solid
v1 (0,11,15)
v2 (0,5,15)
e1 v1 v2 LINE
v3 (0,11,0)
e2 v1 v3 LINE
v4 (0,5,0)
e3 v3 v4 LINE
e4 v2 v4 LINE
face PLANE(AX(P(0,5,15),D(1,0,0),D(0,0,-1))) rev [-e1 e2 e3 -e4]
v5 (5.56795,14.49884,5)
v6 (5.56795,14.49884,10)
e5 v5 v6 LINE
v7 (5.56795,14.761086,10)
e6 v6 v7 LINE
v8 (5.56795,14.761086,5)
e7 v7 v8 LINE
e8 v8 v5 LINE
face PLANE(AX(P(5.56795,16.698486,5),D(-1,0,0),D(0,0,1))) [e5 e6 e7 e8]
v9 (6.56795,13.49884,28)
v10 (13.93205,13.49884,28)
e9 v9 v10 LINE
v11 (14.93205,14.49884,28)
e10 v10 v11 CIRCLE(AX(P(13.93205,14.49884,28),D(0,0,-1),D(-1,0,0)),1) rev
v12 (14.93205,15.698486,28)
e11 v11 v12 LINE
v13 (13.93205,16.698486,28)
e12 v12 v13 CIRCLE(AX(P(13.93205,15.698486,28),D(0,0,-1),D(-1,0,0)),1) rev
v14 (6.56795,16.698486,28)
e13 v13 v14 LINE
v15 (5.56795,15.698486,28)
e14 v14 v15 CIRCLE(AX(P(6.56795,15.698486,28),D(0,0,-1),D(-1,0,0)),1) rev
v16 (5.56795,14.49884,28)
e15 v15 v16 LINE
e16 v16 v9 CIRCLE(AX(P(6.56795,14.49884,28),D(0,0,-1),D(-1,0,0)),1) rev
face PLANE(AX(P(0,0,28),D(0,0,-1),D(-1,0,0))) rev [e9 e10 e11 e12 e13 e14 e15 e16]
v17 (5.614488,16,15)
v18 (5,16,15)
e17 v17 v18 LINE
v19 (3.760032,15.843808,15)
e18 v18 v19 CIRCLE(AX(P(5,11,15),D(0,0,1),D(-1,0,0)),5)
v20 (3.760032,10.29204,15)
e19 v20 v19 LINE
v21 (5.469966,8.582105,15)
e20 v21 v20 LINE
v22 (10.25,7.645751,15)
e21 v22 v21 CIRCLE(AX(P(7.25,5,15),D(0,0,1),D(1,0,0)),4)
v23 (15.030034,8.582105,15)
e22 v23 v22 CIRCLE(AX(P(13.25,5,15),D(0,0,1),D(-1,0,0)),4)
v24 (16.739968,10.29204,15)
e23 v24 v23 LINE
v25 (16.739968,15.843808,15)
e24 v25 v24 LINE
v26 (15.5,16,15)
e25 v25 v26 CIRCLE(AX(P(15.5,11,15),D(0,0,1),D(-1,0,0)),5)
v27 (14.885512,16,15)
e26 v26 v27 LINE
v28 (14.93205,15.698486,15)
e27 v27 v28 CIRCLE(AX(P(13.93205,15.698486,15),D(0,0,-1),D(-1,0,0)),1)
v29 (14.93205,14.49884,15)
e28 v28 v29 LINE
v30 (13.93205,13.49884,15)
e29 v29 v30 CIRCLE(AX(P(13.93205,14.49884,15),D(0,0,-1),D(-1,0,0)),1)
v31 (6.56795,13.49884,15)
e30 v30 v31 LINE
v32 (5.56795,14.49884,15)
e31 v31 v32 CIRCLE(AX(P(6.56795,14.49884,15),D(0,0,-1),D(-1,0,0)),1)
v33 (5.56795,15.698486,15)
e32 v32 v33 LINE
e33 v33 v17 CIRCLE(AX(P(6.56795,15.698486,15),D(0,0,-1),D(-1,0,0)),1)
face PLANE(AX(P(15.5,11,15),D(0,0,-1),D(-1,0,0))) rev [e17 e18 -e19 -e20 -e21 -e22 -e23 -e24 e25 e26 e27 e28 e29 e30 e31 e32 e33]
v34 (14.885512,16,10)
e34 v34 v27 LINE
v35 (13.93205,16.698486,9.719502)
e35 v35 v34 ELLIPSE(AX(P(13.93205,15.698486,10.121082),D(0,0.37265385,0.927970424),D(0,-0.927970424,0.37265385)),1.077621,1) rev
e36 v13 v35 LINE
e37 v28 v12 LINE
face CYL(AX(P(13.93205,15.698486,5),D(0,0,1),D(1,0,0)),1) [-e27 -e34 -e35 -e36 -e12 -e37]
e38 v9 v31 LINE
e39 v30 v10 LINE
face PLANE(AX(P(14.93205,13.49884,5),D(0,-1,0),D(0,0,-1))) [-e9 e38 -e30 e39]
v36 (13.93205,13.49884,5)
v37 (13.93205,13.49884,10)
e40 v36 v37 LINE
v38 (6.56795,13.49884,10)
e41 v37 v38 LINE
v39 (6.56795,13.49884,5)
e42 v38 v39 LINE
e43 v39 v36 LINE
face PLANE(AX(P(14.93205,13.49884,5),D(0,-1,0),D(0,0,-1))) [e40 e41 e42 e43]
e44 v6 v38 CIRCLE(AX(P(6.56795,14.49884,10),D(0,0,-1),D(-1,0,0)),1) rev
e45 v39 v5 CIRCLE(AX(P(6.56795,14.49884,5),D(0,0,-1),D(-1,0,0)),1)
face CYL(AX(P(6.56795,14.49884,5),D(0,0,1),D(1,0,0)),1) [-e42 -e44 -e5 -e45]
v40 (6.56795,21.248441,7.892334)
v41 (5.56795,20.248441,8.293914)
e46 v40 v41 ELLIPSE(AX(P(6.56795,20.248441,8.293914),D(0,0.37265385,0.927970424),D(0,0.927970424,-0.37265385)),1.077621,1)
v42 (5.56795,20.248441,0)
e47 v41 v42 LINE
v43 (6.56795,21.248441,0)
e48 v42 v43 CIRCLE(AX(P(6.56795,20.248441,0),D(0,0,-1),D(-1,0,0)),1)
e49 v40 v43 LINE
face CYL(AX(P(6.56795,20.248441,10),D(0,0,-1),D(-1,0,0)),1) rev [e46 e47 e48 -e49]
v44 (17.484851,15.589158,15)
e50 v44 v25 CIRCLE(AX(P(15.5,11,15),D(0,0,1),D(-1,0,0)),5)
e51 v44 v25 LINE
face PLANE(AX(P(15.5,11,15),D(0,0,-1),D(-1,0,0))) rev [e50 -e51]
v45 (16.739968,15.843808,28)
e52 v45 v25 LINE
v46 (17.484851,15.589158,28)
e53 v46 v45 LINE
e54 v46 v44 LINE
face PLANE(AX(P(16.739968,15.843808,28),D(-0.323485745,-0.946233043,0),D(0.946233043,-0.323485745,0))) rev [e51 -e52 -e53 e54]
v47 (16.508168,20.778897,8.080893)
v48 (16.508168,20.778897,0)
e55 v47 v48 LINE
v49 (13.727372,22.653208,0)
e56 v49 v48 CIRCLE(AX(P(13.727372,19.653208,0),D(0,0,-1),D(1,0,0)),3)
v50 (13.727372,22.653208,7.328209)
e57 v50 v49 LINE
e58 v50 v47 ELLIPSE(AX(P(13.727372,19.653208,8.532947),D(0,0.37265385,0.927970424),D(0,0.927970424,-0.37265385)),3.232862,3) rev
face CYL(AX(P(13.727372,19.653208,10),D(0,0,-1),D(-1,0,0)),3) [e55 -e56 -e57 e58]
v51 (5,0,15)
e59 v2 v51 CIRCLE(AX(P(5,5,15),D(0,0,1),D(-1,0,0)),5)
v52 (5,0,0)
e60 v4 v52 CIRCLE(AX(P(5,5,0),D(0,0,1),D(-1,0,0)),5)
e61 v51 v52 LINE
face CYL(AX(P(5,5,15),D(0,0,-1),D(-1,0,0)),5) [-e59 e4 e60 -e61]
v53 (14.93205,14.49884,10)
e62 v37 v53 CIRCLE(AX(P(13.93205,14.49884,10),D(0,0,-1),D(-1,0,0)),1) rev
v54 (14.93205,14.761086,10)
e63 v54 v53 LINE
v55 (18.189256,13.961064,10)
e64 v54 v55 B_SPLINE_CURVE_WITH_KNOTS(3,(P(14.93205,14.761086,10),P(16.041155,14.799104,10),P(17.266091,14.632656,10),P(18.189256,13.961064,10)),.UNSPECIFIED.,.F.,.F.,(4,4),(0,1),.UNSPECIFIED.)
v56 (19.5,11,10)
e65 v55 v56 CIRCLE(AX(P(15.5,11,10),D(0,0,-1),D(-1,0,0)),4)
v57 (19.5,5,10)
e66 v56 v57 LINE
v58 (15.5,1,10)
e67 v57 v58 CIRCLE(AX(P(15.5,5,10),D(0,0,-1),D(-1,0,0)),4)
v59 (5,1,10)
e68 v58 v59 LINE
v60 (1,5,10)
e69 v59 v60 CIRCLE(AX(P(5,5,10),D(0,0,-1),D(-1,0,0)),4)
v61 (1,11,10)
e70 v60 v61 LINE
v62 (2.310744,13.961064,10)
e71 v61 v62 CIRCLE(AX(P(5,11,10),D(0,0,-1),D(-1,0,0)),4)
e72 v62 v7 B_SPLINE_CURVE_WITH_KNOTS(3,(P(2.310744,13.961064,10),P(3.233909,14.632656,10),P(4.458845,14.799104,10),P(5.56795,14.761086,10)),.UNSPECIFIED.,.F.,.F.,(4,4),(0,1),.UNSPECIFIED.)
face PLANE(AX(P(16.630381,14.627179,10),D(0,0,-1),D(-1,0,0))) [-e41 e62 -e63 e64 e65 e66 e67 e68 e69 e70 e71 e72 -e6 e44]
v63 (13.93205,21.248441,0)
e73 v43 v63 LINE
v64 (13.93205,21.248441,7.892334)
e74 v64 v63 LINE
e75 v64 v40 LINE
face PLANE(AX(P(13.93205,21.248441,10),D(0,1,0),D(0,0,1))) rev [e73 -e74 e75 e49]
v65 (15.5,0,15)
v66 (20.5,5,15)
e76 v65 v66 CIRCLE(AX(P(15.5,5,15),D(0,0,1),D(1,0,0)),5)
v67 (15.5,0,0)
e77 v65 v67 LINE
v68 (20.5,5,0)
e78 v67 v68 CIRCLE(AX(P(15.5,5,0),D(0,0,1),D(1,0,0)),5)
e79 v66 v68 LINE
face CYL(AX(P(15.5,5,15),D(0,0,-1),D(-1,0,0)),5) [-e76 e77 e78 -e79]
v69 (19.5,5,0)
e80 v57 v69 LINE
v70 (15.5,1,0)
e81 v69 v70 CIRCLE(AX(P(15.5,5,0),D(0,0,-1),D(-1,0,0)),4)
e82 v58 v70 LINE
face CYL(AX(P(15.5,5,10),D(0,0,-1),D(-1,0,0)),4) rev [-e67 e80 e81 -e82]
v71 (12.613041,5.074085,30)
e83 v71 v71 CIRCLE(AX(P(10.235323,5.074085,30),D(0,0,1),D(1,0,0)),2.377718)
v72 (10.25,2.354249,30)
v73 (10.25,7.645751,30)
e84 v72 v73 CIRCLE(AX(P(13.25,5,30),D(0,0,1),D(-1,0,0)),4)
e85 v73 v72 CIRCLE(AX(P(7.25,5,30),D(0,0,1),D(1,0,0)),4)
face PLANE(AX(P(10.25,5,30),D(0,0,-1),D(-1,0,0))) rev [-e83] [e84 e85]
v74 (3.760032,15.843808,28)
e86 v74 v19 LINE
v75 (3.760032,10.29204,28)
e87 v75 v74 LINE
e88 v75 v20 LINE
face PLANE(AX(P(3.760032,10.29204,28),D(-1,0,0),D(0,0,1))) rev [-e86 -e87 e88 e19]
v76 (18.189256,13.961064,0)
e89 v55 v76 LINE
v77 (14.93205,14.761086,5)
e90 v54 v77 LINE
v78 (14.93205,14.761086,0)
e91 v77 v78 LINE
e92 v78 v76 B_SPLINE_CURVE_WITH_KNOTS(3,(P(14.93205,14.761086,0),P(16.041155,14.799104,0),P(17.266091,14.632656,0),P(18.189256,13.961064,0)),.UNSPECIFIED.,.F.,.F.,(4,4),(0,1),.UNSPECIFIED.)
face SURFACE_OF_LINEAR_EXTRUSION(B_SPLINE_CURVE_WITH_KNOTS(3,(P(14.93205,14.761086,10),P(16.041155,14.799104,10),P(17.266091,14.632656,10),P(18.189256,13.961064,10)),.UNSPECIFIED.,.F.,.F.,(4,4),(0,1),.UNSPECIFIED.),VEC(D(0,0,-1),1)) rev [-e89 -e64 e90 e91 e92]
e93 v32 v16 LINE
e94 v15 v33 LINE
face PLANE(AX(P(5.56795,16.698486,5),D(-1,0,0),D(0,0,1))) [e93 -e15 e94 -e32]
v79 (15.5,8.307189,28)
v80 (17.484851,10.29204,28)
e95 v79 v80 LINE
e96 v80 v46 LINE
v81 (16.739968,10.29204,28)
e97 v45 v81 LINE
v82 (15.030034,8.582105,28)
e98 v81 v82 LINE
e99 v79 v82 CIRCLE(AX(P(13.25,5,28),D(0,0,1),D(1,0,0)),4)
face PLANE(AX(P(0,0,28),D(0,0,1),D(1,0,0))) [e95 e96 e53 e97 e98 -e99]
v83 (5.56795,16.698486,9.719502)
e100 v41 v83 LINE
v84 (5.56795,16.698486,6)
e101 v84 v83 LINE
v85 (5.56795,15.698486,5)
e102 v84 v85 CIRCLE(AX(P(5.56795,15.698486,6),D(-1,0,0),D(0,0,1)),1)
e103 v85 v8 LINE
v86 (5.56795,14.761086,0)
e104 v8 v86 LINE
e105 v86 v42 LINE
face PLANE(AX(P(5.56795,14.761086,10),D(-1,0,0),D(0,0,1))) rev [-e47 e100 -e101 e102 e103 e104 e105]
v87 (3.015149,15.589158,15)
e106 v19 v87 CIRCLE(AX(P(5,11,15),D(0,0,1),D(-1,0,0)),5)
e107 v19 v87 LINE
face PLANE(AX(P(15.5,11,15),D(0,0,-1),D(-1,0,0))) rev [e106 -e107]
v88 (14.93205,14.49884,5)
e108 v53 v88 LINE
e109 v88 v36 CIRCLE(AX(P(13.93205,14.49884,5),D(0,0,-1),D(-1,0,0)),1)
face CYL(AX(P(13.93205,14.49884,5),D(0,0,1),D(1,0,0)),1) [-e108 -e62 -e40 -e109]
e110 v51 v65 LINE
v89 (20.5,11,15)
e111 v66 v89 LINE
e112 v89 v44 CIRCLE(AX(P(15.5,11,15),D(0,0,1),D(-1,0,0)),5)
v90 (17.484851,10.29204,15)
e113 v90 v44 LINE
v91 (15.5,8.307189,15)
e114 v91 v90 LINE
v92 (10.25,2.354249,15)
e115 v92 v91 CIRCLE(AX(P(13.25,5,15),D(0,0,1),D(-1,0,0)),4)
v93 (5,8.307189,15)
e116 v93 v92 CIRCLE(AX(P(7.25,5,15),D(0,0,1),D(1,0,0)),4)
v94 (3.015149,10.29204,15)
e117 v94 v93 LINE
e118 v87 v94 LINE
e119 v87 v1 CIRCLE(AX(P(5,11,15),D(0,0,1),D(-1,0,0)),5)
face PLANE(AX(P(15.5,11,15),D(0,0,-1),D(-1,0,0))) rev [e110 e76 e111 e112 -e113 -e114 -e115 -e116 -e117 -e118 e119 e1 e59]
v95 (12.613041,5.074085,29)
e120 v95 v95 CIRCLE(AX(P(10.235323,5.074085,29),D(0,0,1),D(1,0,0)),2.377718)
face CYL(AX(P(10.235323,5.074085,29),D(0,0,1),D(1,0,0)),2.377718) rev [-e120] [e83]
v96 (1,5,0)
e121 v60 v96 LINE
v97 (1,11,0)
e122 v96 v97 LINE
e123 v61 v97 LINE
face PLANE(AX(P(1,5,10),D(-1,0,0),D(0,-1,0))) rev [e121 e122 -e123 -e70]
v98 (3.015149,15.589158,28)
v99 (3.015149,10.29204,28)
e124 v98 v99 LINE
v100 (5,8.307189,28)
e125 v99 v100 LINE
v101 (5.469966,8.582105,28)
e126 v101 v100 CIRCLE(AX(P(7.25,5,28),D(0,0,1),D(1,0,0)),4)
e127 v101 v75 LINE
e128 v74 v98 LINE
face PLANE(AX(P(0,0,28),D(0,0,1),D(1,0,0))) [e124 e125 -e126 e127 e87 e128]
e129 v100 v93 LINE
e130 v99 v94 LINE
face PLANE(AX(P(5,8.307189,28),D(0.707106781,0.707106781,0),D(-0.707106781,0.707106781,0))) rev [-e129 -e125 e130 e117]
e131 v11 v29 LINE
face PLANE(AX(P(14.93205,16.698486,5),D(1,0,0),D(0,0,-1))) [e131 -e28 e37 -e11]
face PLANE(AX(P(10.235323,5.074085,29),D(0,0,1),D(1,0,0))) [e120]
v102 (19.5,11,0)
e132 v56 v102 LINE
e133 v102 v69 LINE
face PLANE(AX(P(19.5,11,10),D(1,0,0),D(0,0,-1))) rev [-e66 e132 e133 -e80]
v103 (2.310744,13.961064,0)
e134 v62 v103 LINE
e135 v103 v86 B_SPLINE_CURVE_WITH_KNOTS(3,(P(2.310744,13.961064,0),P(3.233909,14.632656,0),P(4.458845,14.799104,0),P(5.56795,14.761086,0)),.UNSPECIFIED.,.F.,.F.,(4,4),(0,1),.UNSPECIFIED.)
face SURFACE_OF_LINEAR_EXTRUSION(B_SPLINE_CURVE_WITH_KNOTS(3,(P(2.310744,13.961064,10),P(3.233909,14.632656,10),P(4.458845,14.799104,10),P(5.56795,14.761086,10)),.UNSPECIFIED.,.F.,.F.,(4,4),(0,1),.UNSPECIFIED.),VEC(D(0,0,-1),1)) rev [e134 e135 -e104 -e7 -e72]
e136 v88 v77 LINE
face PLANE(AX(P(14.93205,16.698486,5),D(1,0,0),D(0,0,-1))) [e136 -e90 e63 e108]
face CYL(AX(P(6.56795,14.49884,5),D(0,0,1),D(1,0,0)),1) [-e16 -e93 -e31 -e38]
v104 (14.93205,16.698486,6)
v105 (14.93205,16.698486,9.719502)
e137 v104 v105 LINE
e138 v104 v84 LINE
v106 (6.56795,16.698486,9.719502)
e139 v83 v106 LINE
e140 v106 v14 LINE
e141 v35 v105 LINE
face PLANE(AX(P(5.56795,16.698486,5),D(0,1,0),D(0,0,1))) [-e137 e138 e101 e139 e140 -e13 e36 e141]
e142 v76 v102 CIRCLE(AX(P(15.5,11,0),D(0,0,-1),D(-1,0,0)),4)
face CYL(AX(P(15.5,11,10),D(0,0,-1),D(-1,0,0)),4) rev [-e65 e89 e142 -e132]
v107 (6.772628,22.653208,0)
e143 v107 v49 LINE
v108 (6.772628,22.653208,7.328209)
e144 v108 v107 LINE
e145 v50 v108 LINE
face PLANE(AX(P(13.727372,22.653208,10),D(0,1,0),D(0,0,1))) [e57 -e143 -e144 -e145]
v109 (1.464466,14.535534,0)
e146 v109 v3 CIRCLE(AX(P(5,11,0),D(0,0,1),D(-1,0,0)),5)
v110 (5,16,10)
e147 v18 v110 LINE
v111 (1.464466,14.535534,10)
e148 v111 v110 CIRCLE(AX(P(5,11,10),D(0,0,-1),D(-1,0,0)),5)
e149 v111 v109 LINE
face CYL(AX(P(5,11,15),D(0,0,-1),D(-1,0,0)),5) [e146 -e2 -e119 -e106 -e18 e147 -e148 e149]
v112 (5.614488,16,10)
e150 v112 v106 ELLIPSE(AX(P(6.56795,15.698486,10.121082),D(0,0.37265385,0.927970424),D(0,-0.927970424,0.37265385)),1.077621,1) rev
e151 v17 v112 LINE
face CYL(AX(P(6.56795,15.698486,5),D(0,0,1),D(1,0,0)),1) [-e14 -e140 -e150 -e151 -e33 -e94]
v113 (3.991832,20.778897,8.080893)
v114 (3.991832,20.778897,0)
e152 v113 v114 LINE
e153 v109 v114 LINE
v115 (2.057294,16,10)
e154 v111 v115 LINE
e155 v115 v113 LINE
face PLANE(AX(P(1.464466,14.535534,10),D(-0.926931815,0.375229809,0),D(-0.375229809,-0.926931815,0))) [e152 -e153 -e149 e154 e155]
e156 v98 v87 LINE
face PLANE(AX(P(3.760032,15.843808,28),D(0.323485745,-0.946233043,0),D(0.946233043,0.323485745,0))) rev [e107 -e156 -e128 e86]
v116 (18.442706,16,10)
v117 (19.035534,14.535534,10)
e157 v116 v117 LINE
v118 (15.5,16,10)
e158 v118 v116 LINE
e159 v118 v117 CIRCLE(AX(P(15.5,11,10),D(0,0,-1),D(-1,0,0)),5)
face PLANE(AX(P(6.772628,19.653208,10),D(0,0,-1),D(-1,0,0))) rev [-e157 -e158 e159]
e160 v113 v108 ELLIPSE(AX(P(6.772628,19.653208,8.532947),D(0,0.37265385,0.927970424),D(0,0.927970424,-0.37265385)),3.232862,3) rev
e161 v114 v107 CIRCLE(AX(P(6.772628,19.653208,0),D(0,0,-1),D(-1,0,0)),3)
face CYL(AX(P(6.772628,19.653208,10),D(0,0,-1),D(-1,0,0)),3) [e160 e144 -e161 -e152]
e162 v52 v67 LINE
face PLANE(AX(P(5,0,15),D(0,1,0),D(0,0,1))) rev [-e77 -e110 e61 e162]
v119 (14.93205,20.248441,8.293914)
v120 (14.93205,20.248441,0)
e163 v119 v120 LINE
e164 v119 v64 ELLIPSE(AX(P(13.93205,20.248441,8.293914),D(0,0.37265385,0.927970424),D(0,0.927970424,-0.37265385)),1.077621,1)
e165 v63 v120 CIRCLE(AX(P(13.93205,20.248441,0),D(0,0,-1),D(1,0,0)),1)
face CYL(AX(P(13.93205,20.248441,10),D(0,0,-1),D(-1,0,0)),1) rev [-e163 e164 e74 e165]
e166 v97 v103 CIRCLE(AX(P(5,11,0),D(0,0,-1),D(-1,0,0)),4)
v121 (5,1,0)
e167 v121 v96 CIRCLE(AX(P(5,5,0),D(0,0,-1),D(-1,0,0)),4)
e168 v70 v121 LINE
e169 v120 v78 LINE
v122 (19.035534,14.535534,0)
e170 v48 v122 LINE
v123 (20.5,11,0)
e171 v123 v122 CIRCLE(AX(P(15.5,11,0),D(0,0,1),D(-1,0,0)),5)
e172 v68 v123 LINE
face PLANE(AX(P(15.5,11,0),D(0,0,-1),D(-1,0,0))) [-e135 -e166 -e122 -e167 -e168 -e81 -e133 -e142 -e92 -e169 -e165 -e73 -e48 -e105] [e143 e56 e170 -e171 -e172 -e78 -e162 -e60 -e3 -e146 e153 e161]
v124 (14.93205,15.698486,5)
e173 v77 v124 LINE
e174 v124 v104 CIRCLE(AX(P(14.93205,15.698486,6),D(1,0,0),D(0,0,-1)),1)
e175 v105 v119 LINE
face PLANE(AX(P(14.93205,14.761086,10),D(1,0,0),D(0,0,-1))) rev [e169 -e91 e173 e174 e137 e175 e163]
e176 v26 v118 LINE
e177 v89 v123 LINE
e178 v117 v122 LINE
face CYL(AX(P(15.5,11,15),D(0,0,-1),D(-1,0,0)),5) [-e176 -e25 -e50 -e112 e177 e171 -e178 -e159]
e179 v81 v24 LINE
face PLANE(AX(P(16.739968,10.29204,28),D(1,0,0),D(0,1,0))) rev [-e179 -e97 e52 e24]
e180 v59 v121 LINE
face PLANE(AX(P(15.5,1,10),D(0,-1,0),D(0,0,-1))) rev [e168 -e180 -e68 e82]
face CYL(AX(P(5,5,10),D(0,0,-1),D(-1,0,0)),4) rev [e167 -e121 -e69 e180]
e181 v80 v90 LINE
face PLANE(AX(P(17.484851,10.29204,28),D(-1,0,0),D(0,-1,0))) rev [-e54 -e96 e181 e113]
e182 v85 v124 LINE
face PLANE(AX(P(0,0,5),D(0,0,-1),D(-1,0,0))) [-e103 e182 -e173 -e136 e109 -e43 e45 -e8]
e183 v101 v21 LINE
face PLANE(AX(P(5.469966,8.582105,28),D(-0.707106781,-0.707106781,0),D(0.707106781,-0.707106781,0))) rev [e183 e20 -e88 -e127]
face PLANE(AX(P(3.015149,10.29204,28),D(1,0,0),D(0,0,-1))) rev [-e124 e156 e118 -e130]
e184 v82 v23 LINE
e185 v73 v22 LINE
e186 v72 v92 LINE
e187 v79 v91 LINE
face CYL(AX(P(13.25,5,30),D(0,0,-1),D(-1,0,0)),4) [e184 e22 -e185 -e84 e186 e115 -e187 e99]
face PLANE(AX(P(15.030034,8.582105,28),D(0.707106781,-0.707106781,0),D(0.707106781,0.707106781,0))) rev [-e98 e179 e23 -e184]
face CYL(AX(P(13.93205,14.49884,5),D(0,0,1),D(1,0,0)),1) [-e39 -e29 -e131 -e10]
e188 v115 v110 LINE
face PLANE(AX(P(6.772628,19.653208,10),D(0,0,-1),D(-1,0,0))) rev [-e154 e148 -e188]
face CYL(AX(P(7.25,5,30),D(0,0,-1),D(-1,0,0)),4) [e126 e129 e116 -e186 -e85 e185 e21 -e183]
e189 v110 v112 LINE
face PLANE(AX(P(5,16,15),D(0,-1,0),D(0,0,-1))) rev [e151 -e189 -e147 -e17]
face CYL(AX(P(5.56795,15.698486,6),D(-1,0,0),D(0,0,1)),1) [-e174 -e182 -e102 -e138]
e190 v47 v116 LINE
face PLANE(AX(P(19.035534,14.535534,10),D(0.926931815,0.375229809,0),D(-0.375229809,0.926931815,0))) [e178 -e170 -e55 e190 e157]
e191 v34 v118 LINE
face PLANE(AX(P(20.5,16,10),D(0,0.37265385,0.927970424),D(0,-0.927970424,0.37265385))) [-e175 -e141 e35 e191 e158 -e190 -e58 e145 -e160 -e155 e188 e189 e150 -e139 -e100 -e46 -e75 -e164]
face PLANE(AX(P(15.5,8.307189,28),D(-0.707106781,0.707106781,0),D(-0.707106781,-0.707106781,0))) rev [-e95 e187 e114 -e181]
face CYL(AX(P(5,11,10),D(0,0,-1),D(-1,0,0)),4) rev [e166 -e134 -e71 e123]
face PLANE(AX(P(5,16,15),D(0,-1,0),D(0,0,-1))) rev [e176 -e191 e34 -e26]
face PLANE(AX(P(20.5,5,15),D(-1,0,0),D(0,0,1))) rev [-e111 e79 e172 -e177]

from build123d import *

# Parameters (mm, degrees)
EXTRUDE_1_DEPTH      = 15
EXTRUDE_2_DEPTH      = 15
EXTRUDE_3_DEPTH      = 13
EXTRUDE_4_DEPTH      = 10
CUT_EXTRUDE_2_DEPTH  = 43.818428432
CUT_EXTRUDE_3_DEPTH  = 10
EXTRUDE_5_DEPTH      = 13
EXTRUDE_5_DEPTH_BACK = 10
SKETCH_7_W           = 9.36410038
SKETCH_7_H           = 3.199645584
FILLET_1_R           = 1
SKETCH_8_R           = 2.377718278
CUT_EXTRUDE_4_DEPTH  = 1


with BuildPart() as part:
    # ｽｹｯﾁ1 → ﾎﾞｽ - 押し出し1 (new body)
    with BuildSketch(Plane.XY):
        with BuildLine():
            Line((5, 0), (15.5, 0))
            ThreePointArc((15.5, 0), (19.035533906, 1.464466094), (20.5, 5))
            Line((20.5, 5), (20.5, 11))
            ThreePointArc((20.5, 11), (19.035533906, 14.535533906), (15.5, 16))
            Line((15.5, 16), (5, 16))
            ThreePointArc((5, 16), (1.464466094, 14.535533906), (0, 11))
            Line((0, 11), (0, 5))
            ThreePointArc((0, 5), (1.464466094, 1.464466094), (5, 0))
        make_face()
    extrude(amount=EXTRUDE_1_DEPTH)

    # ｽｹｯﾁ2 → ﾎﾞｽ - 押し出し2 (add)
    with BuildSketch(Plane.XY.offset(15)):
        with BuildLine():
            ThreePointArc((10.25, 7.645751311), (3.25, 5), (10.25, 2.354248689))
            ThreePointArc((10.25, 2.354248689), (17.25, 5), (10.25, 7.645751311))
        make_face()
    extrude(amount=EXTRUDE_2_DEPTH)

    # ｽｹｯﾁ3 → ﾎﾞｽ - 押し出し3 (add)
    with BuildSketch(Plane.XY.offset(15)):
        Polygon((5, 8.307189139), (3.015149344, 10.292039795), (3.015149344, 15.589157643), (3.760031936, 15.843808337), (3.760031936, 10.292039795), (5.469966234, 8.582105497), align=None)
        Polygon((15.5, 8.307189139), (15.030033766, 8.582105497), (16.739968064, 10.292039795), (16.739968064, 15.843808337), (17.484850656, 15.589157643), (17.484850656, 10.292039795), align=None)
    extrude(amount=EXTRUDE_3_DEPTH)

    # ｽｹｯﾁ4 → ﾎﾞｽ - 押し出し4 (add)
    with BuildSketch(Plane(origin=(0, 0, 0), x_dir=(-1, 0, 0), z_dir=(0, 0, -1))):
        with BuildLine():
            Line((-19.035533906, 14.535533906), (-16.508167917, 20.778897002))
            ThreePointArc((-16.508167917, 20.778897002), (-15.404115105, 22.140884029), (-13.727372471, 22.653207574))
            Line((-13.727372471, 22.653207574), (-6.772627529, 22.653207574))
            ThreePointArc((-6.772627529, 22.653207574), (-5.095884895, 22.140884029), (-3.991832083, 20.778897002))
            Line((-3.991832083, 20.778897002), (-1.464466094, 14.535533906))
            Line((-1.464466094, 14.535533906), (-19.035533906, 14.535533906))
        make_face()
    extrude(amount=-EXTRUDE_4_DEPTH)

    # ｽｹｯﾁ5 → ｶｯﾄ - 押し出し2 (cut, through all)
    with BuildSketch(Plane(origin=(0, 0, 0), x_dir=(0, 0, -1), z_dir=(1, 0, 0))):
        Polygon((-10, 16), (-7.328208582, 22.653207574), (-10, 22.653207574), align=None)
    extrude(amount=CUT_EXTRUDE_2_DEPTH, mode=Mode.SUBTRACT)

    # ｽｹｯﾁ6 → ｶｯﾄ - 押し出し3 (cut)
    with BuildSketch(Plane(origin=(0, 0, 0), x_dir=(-1, 0, 0), z_dir=(0, 0, -1))):
        with BuildLine():
            Line((-14.93205019, 14.761085745), (-14.93205019, 20.248440553))
            ThreePointArc((-14.93205019, 20.248440553), (-14.639156971, 20.955547334), (-13.93205019, 21.248440553))
            Line((-13.93205019, 21.248440553), (-6.56794981, 21.248440553))
            ThreePointArc((-6.56794981, 21.248440553), (-5.860843029, 20.955547334), (-5.56794981, 20.248440553))
            Line((-5.56794981, 20.248440553), (-5.56794981, 14.761085745))
            add(Edge.make_bspline(
                [(-2.310743979, 13.961064345), (-3.233908529, 14.632656192), (-4.458845113, 14.799104366), (-5.56794981, 14.761085745)],
                knots=[0, 0, 0, 0, 1, 1, 1, 1], degree=3))
            ThreePointArc((-2.310743979, 13.961064345), (-1.342335165, 12.619100972), (-1, 11))
            Line((-1, 11), (-1, 5))
            ThreePointArc((-1, 5), (-2.171572875, 2.171572875), (-5, 1))
            Line((-5, 1), (-15.5, 1))
            ThreePointArc((-15.5, 1), (-18.328427125, 2.171572875), (-19.5, 5))
            Line((-19.5, 5), (-19.5, 11))
            ThreePointArc((-19.5, 11), (-19.157664835, 12.619100972), (-18.189256021, 13.961064345))
            add(Edge.make_bspline(
                [(-18.189256021, 13.961064345), (-17.266091471, 14.632656192), (-16.041154887, 14.799104366), (-14.93205019, 14.761085745)],
                knots=[0, 0, 0, 0, 1, 1, 1, 1], degree=3))
        make_face()
    extrude(amount=-CUT_EXTRUDE_3_DEPTH, mode=Mode.SUBTRACT)

    # ｽｹｯﾁ7 → ﾎﾞｽ - 押し出し5 (add, two sides: drawn at the far end of the back side and taken through both)
    with BuildSketch(Plane.XY.offset(15).offset(-EXTRUDE_5_DEPTH_BACK)):
        with Locations((10.25, 15.098663031)):
            Rectangle(SKETCH_7_W, SKETCH_7_H)
    extrude(amount=EXTRUDE_5_DEPTH + EXTRUDE_5_DEPTH_BACK)

    # ﾌｨﾚｯﾄ1
    # the kernel refuses this fillet: 1 mm, written as the material it takes off along each edge
    with BuildSketch(Plane(origin=(14.93205019, 16.698485823, 5), x_dir=(0, 0, 1), z_dir=(-1, 0, 0))) as fillet_1_piece_1:
        with BuildLine():
            CenterArc((FILLET_1_R, -FILLET_1_R), FILLET_1_R, 90, 90)
            Line((0, -FILLET_1_R), (0, 0))
            Line((0, 0), (FILLET_1_R, 0))
        make_face()
    extrude(amount=9.36410038, mode=Mode.SUBTRACT)
    with BuildSketch(Plane(origin=(14.93205019, 13.498840239, 2.5), x_dir=(0, 1, 0), z_dir=(0, 0, 1))) as fillet_1_piece_2:
        with BuildLine():
            CenterArc((FILLET_1_R, FILLET_1_R), FILLET_1_R, 180, 90)
            Line((0, FILLET_1_R), (0, 0))
            Line((0, 0), (FILLET_1_R, 0))
        make_face()
    extrude(amount=7.5, mode=Mode.SUBTRACT)
    with BuildSketch(Plane(origin=(5.56794981, 13.498840239, 2.5), x_dir=(0, 1, 0), z_dir=(0, 0, 1))) as fillet_1_piece_3:
        with BuildLine():
            CenterArc((FILLET_1_R, -FILLET_1_R), FILLET_1_R, 90, 90)
            Line((0, -FILLET_1_R), (0, 0))
            Line((0, 0), (FILLET_1_R, 0))
        make_face()
    extrude(amount=7.5, mode=Mode.SUBTRACT)
    with BuildSketch(Plane(origin=(5.56794981, 13.498840239, 15), x_dir=(0, 1, 0), z_dir=(0, 0, 1)), Plane(origin=(14.93205019, 13.498840239, 15), x_dir=(-1, 0, 0), z_dir=(0, 0, 1))) as fillet_1_piece_4:
        with BuildLine():
            CenterArc((FILLET_1_R, -FILLET_1_R), FILLET_1_R, 90, 90)
            Line((0, -FILLET_1_R), (0, 0))
            Line((0, 0), (FILLET_1_R, 0))
        make_face()
    extrude(amount=15.5, mode=Mode.SUBTRACT)
    with BuildSketch(Plane(origin=(14.93205019, 16.698485823, 30.5), x_dir=(0, -1, 0), z_dir=(0, 0, -1))) as fillet_1_piece_5_section:
        with BuildLine():
            CenterArc((FILLET_1_R, FILLET_1_R), FILLET_1_R, 180, 90)
            Line((0, FILLET_1_R), (0, 0))
            Line((0, 0), (FILLET_1_R, 0))
        make_face()
    fillet_1_piece_5 = extrude(amount=23.280497551, mode=Mode.PRIVATE)
    fillet_1_piece_5 = split(fillet_1_piece_5, bisect_by=Plane(origin=(14.918146213, 15.92497671, 15), z_dir=(0, 0, 1)), keep=Keep.TOP, mode=Mode.PRIVATE)
    add(fillet_1_piece_5, mode=Mode.SUBTRACT)
    with BuildSketch(Plane(origin=(14.93205019, 16.698485823, 30.5), x_dir=(0, -1, 0), z_dir=(0, 0, -1))) as fillet_1_piece_6_section:
        with BuildLine():
            CenterArc((FILLET_1_R, FILLET_1_R), FILLET_1_R, 180, 90)
            Line((0, FILLET_1_R), (0, 0))
            Line((0, 0), (FILLET_1_R, 0))
        make_face()
    fillet_1_piece_6 = extrude(amount=23.280497551, mode=Mode.PRIVATE)
    fillet_1_piece_6 = split(fillet_1_piece_6, bisect_by=Plane(origin=(14.70262804, 15.590982586, 10.164252987), z_dir=(0, 0.3726538497201509, 0.927970424253247)), keep=Keep.TOP, mode=Mode.PRIVATE)
    fillet_1_piece_6 = split(fillet_1_piece_6, bisect_by=Plane(origin=(14.70262804, 16, 12.401713298), z_dir=(0, 1, 0)), keep=Keep.TOP, mode=Mode.PRIVATE)
    add(fillet_1_piece_6, mode=Mode.SUBTRACT)
    with BuildSketch(Plane(origin=(5.56794981, 16.698485823, 30.5), x_dir=(0, -1, 0), z_dir=(0, 0, -1))) as fillet_1_piece_7_section:
        with BuildLine():
            CenterArc((FILLET_1_R, -FILLET_1_R), FILLET_1_R, 90, 90)
            Line((0, -FILLET_1_R), (0, 0))
            Line((0, 0), (FILLET_1_R, 0))
        make_face()
    fillet_1_piece_7 = extrude(amount=23.280497551, mode=Mode.PRIVATE)
    fillet_1_piece_7 = split(fillet_1_piece_7, bisect_by=Plane(origin=(5.581853787, 15.92497671, 15), z_dir=(0, 0, 1)), keep=Keep.TOP, mode=Mode.PRIVATE)
    add(fillet_1_piece_7, mode=Mode.SUBTRACT)
    with BuildSketch(Plane(origin=(5.56794981, 16.698485823, 30.5), x_dir=(0, -1, 0), z_dir=(0, 0, -1))) as fillet_1_piece_8_section:
        with BuildLine():
            CenterArc((FILLET_1_R, -FILLET_1_R), FILLET_1_R, 90, 90)
            Line((0, -FILLET_1_R), (0, 0))
            Line((0, 0), (FILLET_1_R, 0))
        make_face()
    fillet_1_piece_8 = extrude(amount=23.280497551, mode=Mode.PRIVATE)
    fillet_1_piece_8 = split(fillet_1_piece_8, bisect_by=Plane(origin=(5.79737196, 16, 12.401713298), z_dir=(0, 1, 0)), keep=Keep.TOP, mode=Mode.PRIVATE)
    fillet_1_piece_8 = split(fillet_1_piece_8, bisect_by=Plane(origin=(5.79737196, 15.590982586, 10.164252987), z_dir=(0, 0.3726538497201509, 0.927970424253247)), keep=Keep.TOP, mode=Mode.PRIVATE)
    add(fillet_1_piece_8, mode=Mode.SUBTRACT)

    # ｽｹｯﾁ8 → ｶｯﾄ - 押し出し4 (cut)
    with BuildSketch(Plane.XY.offset(30)):
        with Locations((10.235322727, 5.074085352)):
            Circle(SKETCH_8_R)
    extrude(amount=-CUT_EXTRUDE_4_DEPTH, mode=Mode.SUBTRACT)


solid = part.part
